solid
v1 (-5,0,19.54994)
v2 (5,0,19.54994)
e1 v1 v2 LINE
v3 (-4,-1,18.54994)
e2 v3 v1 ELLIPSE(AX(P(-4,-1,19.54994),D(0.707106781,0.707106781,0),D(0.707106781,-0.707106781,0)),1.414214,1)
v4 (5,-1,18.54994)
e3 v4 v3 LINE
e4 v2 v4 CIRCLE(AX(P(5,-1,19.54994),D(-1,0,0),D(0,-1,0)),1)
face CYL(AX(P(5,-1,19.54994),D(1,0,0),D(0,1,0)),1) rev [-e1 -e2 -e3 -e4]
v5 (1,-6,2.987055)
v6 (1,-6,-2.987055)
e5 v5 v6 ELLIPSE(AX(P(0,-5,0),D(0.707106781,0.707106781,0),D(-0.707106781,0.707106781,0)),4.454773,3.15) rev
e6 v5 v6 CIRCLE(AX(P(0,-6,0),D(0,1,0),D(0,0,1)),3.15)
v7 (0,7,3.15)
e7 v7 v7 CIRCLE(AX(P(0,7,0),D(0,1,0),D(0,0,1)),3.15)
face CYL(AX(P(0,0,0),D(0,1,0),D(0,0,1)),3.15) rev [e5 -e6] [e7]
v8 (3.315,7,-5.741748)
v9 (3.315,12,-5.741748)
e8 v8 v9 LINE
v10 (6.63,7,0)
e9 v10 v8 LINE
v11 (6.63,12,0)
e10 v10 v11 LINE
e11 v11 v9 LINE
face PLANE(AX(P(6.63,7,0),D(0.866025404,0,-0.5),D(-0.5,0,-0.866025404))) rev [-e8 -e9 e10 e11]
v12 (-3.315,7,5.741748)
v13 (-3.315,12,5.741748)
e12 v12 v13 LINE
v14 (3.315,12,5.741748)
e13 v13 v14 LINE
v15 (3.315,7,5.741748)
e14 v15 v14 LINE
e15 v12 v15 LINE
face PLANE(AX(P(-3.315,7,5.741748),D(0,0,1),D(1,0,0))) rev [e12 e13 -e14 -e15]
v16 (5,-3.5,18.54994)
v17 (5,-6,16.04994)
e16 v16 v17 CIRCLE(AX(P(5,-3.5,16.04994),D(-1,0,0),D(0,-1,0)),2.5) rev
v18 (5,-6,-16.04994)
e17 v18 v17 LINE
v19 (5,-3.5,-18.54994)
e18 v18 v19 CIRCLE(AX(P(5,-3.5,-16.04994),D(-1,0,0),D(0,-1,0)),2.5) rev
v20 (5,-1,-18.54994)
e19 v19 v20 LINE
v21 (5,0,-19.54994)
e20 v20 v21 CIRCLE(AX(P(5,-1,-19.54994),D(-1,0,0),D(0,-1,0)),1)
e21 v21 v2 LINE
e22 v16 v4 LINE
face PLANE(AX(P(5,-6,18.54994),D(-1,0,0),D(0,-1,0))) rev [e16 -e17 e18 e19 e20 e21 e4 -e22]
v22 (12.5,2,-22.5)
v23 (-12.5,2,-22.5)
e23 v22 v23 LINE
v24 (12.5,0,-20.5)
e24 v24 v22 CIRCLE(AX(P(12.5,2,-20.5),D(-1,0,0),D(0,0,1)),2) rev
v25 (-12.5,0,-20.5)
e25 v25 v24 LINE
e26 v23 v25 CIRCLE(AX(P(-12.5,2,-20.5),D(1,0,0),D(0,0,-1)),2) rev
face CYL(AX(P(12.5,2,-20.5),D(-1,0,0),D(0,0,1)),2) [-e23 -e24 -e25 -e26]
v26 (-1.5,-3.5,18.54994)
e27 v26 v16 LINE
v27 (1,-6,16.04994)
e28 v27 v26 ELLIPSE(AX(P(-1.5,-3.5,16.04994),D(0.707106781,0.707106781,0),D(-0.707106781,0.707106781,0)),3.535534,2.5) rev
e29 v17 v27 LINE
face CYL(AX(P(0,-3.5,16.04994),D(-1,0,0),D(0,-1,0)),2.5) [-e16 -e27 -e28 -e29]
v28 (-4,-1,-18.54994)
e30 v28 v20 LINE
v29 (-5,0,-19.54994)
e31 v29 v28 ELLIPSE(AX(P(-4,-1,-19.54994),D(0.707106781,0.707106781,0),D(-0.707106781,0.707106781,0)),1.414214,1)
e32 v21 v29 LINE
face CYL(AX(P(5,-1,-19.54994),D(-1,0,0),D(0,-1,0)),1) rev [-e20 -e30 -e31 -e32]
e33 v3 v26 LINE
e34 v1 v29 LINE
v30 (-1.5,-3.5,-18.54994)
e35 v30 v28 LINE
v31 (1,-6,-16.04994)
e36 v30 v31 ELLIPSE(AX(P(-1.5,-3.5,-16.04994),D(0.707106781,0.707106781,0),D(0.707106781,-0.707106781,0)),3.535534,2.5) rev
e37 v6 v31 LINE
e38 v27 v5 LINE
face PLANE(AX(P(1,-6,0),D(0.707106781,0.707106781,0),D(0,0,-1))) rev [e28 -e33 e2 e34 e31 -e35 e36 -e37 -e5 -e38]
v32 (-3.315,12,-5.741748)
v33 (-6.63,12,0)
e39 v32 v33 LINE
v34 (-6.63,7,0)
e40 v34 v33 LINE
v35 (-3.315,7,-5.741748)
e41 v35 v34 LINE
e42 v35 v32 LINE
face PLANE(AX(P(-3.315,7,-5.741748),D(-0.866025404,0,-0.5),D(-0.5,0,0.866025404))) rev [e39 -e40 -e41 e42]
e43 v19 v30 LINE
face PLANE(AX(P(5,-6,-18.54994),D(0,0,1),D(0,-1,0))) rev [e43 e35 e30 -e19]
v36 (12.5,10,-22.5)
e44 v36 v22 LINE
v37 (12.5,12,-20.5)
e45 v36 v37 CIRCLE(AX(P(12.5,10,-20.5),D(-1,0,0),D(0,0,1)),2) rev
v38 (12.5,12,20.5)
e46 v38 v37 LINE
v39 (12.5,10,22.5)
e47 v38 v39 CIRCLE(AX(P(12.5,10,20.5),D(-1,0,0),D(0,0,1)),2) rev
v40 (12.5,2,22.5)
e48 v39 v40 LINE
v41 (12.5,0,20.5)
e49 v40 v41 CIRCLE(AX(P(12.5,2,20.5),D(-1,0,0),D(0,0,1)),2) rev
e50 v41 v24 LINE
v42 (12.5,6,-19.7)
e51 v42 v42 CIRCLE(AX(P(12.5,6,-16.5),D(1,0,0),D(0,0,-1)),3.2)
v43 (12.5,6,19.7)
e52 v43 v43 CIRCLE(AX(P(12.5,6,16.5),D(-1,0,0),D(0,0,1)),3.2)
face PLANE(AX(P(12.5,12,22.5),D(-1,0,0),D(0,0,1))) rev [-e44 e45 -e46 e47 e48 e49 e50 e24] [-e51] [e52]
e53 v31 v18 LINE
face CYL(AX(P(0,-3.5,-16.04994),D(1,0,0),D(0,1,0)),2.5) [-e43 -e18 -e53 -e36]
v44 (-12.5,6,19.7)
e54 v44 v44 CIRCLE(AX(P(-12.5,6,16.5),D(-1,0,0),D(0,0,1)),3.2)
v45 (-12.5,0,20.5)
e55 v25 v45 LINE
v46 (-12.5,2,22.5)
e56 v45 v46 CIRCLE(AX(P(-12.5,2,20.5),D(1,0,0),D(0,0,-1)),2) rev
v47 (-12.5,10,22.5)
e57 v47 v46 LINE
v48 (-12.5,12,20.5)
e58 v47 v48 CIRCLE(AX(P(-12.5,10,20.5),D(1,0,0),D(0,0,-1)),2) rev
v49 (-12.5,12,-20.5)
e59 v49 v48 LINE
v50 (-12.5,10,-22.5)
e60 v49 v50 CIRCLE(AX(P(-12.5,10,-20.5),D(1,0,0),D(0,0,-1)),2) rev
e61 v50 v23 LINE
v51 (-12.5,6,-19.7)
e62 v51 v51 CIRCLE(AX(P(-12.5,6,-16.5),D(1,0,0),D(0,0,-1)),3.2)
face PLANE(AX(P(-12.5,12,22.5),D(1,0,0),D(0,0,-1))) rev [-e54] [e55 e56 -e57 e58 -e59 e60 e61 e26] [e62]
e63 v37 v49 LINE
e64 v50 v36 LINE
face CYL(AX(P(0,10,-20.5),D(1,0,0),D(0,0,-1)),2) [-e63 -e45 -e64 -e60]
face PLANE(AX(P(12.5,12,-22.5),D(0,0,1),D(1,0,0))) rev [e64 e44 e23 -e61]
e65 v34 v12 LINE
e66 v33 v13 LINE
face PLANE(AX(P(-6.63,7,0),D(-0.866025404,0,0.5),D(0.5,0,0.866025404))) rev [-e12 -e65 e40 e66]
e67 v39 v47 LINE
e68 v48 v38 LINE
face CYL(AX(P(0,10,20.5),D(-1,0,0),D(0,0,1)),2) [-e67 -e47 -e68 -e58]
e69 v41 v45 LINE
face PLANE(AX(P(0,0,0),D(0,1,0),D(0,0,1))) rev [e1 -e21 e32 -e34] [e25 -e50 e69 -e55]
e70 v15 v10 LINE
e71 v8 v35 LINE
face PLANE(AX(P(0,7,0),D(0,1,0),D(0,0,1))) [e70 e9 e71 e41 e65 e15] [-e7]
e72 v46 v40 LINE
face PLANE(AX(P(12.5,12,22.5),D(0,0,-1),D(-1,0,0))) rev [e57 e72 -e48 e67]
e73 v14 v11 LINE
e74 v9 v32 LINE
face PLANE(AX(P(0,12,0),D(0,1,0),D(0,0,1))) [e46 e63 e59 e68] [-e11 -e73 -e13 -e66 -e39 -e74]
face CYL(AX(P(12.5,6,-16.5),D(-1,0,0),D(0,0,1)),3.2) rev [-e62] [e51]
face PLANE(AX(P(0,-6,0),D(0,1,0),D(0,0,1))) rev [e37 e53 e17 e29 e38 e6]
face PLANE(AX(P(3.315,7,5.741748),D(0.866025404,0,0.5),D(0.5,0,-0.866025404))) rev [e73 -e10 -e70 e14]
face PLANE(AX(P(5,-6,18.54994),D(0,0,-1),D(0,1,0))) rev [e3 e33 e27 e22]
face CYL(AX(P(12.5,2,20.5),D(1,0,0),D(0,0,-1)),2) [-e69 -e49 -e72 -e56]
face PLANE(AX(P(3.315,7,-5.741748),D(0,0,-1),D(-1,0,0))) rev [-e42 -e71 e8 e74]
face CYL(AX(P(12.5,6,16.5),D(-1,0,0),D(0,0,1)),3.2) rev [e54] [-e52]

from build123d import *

# Parameters (mm, degrees)
SKETCH1_W           = 25
SKETCH1_H           = 45
BOSS_EXTRUDE1_DEPTH = 12
CUT_EXTRUDE1_DEPTH  = 5
SKETCH3_R           = 3.15
CUT_EXTRUDE2_DEPTH  = 27.673957337
SKETCH8_R           = 3.2
CUT_EXTRUDE5_DEPTH  = 36.710642671
FILLET1_R           = 2
SKETCH10_W          = 10
SKETCH10_H          = 37.099879626
BOSS_EXTRUDE2_DEPTH = 6
CHAMFER1_SIZE       = 6
FILLET2_R           = 2.5
FILLET3_R           = 1
SKETCH12_R          = 3.15
CUT_EXTRUDE6_DEPTH  = 6


# Some blends are built 0.0001 mm under size
with BuildPart() as part:
    # Sketch1 → Boss-Extrude1 (new body)
    with BuildSketch(Plane(origin=(0, 0, 0), x_dir=(1, 0, 0), z_dir=(0, 1, 0))):
        Rectangle(SKETCH1_W, SKETCH1_H)
    extrude(amount=BOSS_EXTRUDE1_DEPTH)

    # Sketch2 → Cut-Extrude1 (cut)
    with BuildSketch(Plane(origin=(0, 12, 0), x_dir=(1, 0, 0), z_dir=(0, 1, 0))):
        Polygon((3.315, -5.741748427), (6.63, 0), (3.315, 5.741748427), (-3.315, 5.741748427), (-6.63, 0), (-3.315, -5.741748427), align=None)
    extrude(amount=-CUT_EXTRUDE1_DEPTH, mode=Mode.SUBTRACT)

    # Sketch3 → Cut-Extrude2 (cut, through all)
    with BuildSketch(Plane(origin=(0, 7, 0), x_dir=(1, 0, 0), z_dir=(0, 1, 0))):
        with Locations(Location((0, 0, 0), (0, 0, 270))):
            Circle(SKETCH3_R)
    extrude(amount=-CUT_EXTRUDE2_DEPTH, mode=Mode.SUBTRACT)

    # Sketch8 → Cut-Extrude5 (cut, through all)
    with BuildSketch(Plane.ZY.offset(12.5)):
        with Locations((16.5, 6)):
            Circle(SKETCH8_R)
    cut_extrude5 = extrude(amount=-CUT_EXTRUDE5_DEPTH, mode=Mode.SUBTRACT)

    # Mirror1: Cut-Extrude5 across plane
    add(cut_extrude5.mirror(Plane.XY), mode=Mode.SUBTRACT)

    # Fillet1
    fillet1_edges = [part.edges().sort_by_distance(p)[0] for p in [
        (0, 12, -22.5),
        (0, 0, -22.5),
        (0, 0, 22.5),
        (0, 12, 22.5),
    ]]
    fillet(fillet1_edges, radius=FILLET1_R)

    # Sketch10 → Boss-Extrude2 (add)
    with BuildSketch(Plane(origin=(0, 0, 0), x_dir=(-1, 0, 0), z_dir=(0, -1, 0))):
        Rectangle(SKETCH10_W, SKETCH10_H)
    extrude(amount=BOSS_EXTRUDE2_DEPTH)

    # Chamfer1
    chamfer1_edges = [part.edges().sort_by_distance(p)[0] for p in [
        (-5, -6, 0),
    ]]
    chamfer(chamfer1_edges, length=CHAMFER1_SIZE - 0.0001)  # a hair under: the kernel refuses the full size

    # Fillet2
    fillet2_edges = [part.edges().sort_by_distance(p)[0] for p in [
        (2.99995, -6, 18.549939813),
        (2.99995, -6, -18.549939813),
    ]]
    fillet(fillet2_edges, radius=FILLET2_R)

    # Fillet3
    # the kernel refuses this fillet: 1 mm, written as the material it adds along each edge
    with BuildSketch(Plane(origin=(-7.5, 0, -18.549939813), x_dir=(0, 0, -1), z_dir=(1, 0, 0))) as fillet3_piece_1_section:
        with BuildLine():
            CenterArc((FILLET3_R, -FILLET3_R), FILLET3_R, 90, 90)
            Line((0, -FILLET3_R), (0, 0))
            Line((0, 0), (FILLET3_R, 0))
        make_face()
    fillet3_piece_1 = extrude(amount=12.5, mode=Mode.PRIVATE)
    fillet3_piece_1 = split(fillet3_piece_1, bisect_by=Plane(origin=(-5.010050002, 0.009950002, -19.039939721), z_dir=(0.7071067811865476, 0.7071067811865476, 0)), keep=Keep.TOP, mode=Mode.PRIVATE)
    add(fillet3_piece_1)
    with BuildSketch(Plane(origin=(5, 0, 18.549939813), x_dir=(0, -1, 0), z_dir=(-1, 0, 0))) as fillet3_piece_2_section:
        with BuildLine():
            CenterArc((FILLET3_R, FILLET3_R), FILLET3_R, 180, 90)
            Line((0, FILLET3_R), (0, 0))
            Line((0, 0), (FILLET3_R, 0))
        make_face()
    fillet3_piece_2 = extrude(amount=12.5, mode=Mode.PRIVATE)
    fillet3_piece_2 = split(fillet3_piece_2, bisect_by=Plane(origin=(-2.333623853, -2.666476147, 18.779122608), z_dir=(0.7071067811865476, 0.7071067811865476, 0)), keep=Keep.TOP, mode=Mode.PRIVATE)
    add(fillet3_piece_2)

    # Sketch12 → Cut-Extrude6 (cut)
    with BuildSketch(Plane(origin=(0, 0, 0), x_dir=(1, 0, 0), z_dir=(0, 1, 0))):
        with Locations(Location((0, 0, 0), (0, 0, 270))):
            Circle(SKETCH12_R)
    extrude(amount=-CUT_EXTRUDE6_DEPTH, mode=Mode.SUBTRACT)


solid = part.part
